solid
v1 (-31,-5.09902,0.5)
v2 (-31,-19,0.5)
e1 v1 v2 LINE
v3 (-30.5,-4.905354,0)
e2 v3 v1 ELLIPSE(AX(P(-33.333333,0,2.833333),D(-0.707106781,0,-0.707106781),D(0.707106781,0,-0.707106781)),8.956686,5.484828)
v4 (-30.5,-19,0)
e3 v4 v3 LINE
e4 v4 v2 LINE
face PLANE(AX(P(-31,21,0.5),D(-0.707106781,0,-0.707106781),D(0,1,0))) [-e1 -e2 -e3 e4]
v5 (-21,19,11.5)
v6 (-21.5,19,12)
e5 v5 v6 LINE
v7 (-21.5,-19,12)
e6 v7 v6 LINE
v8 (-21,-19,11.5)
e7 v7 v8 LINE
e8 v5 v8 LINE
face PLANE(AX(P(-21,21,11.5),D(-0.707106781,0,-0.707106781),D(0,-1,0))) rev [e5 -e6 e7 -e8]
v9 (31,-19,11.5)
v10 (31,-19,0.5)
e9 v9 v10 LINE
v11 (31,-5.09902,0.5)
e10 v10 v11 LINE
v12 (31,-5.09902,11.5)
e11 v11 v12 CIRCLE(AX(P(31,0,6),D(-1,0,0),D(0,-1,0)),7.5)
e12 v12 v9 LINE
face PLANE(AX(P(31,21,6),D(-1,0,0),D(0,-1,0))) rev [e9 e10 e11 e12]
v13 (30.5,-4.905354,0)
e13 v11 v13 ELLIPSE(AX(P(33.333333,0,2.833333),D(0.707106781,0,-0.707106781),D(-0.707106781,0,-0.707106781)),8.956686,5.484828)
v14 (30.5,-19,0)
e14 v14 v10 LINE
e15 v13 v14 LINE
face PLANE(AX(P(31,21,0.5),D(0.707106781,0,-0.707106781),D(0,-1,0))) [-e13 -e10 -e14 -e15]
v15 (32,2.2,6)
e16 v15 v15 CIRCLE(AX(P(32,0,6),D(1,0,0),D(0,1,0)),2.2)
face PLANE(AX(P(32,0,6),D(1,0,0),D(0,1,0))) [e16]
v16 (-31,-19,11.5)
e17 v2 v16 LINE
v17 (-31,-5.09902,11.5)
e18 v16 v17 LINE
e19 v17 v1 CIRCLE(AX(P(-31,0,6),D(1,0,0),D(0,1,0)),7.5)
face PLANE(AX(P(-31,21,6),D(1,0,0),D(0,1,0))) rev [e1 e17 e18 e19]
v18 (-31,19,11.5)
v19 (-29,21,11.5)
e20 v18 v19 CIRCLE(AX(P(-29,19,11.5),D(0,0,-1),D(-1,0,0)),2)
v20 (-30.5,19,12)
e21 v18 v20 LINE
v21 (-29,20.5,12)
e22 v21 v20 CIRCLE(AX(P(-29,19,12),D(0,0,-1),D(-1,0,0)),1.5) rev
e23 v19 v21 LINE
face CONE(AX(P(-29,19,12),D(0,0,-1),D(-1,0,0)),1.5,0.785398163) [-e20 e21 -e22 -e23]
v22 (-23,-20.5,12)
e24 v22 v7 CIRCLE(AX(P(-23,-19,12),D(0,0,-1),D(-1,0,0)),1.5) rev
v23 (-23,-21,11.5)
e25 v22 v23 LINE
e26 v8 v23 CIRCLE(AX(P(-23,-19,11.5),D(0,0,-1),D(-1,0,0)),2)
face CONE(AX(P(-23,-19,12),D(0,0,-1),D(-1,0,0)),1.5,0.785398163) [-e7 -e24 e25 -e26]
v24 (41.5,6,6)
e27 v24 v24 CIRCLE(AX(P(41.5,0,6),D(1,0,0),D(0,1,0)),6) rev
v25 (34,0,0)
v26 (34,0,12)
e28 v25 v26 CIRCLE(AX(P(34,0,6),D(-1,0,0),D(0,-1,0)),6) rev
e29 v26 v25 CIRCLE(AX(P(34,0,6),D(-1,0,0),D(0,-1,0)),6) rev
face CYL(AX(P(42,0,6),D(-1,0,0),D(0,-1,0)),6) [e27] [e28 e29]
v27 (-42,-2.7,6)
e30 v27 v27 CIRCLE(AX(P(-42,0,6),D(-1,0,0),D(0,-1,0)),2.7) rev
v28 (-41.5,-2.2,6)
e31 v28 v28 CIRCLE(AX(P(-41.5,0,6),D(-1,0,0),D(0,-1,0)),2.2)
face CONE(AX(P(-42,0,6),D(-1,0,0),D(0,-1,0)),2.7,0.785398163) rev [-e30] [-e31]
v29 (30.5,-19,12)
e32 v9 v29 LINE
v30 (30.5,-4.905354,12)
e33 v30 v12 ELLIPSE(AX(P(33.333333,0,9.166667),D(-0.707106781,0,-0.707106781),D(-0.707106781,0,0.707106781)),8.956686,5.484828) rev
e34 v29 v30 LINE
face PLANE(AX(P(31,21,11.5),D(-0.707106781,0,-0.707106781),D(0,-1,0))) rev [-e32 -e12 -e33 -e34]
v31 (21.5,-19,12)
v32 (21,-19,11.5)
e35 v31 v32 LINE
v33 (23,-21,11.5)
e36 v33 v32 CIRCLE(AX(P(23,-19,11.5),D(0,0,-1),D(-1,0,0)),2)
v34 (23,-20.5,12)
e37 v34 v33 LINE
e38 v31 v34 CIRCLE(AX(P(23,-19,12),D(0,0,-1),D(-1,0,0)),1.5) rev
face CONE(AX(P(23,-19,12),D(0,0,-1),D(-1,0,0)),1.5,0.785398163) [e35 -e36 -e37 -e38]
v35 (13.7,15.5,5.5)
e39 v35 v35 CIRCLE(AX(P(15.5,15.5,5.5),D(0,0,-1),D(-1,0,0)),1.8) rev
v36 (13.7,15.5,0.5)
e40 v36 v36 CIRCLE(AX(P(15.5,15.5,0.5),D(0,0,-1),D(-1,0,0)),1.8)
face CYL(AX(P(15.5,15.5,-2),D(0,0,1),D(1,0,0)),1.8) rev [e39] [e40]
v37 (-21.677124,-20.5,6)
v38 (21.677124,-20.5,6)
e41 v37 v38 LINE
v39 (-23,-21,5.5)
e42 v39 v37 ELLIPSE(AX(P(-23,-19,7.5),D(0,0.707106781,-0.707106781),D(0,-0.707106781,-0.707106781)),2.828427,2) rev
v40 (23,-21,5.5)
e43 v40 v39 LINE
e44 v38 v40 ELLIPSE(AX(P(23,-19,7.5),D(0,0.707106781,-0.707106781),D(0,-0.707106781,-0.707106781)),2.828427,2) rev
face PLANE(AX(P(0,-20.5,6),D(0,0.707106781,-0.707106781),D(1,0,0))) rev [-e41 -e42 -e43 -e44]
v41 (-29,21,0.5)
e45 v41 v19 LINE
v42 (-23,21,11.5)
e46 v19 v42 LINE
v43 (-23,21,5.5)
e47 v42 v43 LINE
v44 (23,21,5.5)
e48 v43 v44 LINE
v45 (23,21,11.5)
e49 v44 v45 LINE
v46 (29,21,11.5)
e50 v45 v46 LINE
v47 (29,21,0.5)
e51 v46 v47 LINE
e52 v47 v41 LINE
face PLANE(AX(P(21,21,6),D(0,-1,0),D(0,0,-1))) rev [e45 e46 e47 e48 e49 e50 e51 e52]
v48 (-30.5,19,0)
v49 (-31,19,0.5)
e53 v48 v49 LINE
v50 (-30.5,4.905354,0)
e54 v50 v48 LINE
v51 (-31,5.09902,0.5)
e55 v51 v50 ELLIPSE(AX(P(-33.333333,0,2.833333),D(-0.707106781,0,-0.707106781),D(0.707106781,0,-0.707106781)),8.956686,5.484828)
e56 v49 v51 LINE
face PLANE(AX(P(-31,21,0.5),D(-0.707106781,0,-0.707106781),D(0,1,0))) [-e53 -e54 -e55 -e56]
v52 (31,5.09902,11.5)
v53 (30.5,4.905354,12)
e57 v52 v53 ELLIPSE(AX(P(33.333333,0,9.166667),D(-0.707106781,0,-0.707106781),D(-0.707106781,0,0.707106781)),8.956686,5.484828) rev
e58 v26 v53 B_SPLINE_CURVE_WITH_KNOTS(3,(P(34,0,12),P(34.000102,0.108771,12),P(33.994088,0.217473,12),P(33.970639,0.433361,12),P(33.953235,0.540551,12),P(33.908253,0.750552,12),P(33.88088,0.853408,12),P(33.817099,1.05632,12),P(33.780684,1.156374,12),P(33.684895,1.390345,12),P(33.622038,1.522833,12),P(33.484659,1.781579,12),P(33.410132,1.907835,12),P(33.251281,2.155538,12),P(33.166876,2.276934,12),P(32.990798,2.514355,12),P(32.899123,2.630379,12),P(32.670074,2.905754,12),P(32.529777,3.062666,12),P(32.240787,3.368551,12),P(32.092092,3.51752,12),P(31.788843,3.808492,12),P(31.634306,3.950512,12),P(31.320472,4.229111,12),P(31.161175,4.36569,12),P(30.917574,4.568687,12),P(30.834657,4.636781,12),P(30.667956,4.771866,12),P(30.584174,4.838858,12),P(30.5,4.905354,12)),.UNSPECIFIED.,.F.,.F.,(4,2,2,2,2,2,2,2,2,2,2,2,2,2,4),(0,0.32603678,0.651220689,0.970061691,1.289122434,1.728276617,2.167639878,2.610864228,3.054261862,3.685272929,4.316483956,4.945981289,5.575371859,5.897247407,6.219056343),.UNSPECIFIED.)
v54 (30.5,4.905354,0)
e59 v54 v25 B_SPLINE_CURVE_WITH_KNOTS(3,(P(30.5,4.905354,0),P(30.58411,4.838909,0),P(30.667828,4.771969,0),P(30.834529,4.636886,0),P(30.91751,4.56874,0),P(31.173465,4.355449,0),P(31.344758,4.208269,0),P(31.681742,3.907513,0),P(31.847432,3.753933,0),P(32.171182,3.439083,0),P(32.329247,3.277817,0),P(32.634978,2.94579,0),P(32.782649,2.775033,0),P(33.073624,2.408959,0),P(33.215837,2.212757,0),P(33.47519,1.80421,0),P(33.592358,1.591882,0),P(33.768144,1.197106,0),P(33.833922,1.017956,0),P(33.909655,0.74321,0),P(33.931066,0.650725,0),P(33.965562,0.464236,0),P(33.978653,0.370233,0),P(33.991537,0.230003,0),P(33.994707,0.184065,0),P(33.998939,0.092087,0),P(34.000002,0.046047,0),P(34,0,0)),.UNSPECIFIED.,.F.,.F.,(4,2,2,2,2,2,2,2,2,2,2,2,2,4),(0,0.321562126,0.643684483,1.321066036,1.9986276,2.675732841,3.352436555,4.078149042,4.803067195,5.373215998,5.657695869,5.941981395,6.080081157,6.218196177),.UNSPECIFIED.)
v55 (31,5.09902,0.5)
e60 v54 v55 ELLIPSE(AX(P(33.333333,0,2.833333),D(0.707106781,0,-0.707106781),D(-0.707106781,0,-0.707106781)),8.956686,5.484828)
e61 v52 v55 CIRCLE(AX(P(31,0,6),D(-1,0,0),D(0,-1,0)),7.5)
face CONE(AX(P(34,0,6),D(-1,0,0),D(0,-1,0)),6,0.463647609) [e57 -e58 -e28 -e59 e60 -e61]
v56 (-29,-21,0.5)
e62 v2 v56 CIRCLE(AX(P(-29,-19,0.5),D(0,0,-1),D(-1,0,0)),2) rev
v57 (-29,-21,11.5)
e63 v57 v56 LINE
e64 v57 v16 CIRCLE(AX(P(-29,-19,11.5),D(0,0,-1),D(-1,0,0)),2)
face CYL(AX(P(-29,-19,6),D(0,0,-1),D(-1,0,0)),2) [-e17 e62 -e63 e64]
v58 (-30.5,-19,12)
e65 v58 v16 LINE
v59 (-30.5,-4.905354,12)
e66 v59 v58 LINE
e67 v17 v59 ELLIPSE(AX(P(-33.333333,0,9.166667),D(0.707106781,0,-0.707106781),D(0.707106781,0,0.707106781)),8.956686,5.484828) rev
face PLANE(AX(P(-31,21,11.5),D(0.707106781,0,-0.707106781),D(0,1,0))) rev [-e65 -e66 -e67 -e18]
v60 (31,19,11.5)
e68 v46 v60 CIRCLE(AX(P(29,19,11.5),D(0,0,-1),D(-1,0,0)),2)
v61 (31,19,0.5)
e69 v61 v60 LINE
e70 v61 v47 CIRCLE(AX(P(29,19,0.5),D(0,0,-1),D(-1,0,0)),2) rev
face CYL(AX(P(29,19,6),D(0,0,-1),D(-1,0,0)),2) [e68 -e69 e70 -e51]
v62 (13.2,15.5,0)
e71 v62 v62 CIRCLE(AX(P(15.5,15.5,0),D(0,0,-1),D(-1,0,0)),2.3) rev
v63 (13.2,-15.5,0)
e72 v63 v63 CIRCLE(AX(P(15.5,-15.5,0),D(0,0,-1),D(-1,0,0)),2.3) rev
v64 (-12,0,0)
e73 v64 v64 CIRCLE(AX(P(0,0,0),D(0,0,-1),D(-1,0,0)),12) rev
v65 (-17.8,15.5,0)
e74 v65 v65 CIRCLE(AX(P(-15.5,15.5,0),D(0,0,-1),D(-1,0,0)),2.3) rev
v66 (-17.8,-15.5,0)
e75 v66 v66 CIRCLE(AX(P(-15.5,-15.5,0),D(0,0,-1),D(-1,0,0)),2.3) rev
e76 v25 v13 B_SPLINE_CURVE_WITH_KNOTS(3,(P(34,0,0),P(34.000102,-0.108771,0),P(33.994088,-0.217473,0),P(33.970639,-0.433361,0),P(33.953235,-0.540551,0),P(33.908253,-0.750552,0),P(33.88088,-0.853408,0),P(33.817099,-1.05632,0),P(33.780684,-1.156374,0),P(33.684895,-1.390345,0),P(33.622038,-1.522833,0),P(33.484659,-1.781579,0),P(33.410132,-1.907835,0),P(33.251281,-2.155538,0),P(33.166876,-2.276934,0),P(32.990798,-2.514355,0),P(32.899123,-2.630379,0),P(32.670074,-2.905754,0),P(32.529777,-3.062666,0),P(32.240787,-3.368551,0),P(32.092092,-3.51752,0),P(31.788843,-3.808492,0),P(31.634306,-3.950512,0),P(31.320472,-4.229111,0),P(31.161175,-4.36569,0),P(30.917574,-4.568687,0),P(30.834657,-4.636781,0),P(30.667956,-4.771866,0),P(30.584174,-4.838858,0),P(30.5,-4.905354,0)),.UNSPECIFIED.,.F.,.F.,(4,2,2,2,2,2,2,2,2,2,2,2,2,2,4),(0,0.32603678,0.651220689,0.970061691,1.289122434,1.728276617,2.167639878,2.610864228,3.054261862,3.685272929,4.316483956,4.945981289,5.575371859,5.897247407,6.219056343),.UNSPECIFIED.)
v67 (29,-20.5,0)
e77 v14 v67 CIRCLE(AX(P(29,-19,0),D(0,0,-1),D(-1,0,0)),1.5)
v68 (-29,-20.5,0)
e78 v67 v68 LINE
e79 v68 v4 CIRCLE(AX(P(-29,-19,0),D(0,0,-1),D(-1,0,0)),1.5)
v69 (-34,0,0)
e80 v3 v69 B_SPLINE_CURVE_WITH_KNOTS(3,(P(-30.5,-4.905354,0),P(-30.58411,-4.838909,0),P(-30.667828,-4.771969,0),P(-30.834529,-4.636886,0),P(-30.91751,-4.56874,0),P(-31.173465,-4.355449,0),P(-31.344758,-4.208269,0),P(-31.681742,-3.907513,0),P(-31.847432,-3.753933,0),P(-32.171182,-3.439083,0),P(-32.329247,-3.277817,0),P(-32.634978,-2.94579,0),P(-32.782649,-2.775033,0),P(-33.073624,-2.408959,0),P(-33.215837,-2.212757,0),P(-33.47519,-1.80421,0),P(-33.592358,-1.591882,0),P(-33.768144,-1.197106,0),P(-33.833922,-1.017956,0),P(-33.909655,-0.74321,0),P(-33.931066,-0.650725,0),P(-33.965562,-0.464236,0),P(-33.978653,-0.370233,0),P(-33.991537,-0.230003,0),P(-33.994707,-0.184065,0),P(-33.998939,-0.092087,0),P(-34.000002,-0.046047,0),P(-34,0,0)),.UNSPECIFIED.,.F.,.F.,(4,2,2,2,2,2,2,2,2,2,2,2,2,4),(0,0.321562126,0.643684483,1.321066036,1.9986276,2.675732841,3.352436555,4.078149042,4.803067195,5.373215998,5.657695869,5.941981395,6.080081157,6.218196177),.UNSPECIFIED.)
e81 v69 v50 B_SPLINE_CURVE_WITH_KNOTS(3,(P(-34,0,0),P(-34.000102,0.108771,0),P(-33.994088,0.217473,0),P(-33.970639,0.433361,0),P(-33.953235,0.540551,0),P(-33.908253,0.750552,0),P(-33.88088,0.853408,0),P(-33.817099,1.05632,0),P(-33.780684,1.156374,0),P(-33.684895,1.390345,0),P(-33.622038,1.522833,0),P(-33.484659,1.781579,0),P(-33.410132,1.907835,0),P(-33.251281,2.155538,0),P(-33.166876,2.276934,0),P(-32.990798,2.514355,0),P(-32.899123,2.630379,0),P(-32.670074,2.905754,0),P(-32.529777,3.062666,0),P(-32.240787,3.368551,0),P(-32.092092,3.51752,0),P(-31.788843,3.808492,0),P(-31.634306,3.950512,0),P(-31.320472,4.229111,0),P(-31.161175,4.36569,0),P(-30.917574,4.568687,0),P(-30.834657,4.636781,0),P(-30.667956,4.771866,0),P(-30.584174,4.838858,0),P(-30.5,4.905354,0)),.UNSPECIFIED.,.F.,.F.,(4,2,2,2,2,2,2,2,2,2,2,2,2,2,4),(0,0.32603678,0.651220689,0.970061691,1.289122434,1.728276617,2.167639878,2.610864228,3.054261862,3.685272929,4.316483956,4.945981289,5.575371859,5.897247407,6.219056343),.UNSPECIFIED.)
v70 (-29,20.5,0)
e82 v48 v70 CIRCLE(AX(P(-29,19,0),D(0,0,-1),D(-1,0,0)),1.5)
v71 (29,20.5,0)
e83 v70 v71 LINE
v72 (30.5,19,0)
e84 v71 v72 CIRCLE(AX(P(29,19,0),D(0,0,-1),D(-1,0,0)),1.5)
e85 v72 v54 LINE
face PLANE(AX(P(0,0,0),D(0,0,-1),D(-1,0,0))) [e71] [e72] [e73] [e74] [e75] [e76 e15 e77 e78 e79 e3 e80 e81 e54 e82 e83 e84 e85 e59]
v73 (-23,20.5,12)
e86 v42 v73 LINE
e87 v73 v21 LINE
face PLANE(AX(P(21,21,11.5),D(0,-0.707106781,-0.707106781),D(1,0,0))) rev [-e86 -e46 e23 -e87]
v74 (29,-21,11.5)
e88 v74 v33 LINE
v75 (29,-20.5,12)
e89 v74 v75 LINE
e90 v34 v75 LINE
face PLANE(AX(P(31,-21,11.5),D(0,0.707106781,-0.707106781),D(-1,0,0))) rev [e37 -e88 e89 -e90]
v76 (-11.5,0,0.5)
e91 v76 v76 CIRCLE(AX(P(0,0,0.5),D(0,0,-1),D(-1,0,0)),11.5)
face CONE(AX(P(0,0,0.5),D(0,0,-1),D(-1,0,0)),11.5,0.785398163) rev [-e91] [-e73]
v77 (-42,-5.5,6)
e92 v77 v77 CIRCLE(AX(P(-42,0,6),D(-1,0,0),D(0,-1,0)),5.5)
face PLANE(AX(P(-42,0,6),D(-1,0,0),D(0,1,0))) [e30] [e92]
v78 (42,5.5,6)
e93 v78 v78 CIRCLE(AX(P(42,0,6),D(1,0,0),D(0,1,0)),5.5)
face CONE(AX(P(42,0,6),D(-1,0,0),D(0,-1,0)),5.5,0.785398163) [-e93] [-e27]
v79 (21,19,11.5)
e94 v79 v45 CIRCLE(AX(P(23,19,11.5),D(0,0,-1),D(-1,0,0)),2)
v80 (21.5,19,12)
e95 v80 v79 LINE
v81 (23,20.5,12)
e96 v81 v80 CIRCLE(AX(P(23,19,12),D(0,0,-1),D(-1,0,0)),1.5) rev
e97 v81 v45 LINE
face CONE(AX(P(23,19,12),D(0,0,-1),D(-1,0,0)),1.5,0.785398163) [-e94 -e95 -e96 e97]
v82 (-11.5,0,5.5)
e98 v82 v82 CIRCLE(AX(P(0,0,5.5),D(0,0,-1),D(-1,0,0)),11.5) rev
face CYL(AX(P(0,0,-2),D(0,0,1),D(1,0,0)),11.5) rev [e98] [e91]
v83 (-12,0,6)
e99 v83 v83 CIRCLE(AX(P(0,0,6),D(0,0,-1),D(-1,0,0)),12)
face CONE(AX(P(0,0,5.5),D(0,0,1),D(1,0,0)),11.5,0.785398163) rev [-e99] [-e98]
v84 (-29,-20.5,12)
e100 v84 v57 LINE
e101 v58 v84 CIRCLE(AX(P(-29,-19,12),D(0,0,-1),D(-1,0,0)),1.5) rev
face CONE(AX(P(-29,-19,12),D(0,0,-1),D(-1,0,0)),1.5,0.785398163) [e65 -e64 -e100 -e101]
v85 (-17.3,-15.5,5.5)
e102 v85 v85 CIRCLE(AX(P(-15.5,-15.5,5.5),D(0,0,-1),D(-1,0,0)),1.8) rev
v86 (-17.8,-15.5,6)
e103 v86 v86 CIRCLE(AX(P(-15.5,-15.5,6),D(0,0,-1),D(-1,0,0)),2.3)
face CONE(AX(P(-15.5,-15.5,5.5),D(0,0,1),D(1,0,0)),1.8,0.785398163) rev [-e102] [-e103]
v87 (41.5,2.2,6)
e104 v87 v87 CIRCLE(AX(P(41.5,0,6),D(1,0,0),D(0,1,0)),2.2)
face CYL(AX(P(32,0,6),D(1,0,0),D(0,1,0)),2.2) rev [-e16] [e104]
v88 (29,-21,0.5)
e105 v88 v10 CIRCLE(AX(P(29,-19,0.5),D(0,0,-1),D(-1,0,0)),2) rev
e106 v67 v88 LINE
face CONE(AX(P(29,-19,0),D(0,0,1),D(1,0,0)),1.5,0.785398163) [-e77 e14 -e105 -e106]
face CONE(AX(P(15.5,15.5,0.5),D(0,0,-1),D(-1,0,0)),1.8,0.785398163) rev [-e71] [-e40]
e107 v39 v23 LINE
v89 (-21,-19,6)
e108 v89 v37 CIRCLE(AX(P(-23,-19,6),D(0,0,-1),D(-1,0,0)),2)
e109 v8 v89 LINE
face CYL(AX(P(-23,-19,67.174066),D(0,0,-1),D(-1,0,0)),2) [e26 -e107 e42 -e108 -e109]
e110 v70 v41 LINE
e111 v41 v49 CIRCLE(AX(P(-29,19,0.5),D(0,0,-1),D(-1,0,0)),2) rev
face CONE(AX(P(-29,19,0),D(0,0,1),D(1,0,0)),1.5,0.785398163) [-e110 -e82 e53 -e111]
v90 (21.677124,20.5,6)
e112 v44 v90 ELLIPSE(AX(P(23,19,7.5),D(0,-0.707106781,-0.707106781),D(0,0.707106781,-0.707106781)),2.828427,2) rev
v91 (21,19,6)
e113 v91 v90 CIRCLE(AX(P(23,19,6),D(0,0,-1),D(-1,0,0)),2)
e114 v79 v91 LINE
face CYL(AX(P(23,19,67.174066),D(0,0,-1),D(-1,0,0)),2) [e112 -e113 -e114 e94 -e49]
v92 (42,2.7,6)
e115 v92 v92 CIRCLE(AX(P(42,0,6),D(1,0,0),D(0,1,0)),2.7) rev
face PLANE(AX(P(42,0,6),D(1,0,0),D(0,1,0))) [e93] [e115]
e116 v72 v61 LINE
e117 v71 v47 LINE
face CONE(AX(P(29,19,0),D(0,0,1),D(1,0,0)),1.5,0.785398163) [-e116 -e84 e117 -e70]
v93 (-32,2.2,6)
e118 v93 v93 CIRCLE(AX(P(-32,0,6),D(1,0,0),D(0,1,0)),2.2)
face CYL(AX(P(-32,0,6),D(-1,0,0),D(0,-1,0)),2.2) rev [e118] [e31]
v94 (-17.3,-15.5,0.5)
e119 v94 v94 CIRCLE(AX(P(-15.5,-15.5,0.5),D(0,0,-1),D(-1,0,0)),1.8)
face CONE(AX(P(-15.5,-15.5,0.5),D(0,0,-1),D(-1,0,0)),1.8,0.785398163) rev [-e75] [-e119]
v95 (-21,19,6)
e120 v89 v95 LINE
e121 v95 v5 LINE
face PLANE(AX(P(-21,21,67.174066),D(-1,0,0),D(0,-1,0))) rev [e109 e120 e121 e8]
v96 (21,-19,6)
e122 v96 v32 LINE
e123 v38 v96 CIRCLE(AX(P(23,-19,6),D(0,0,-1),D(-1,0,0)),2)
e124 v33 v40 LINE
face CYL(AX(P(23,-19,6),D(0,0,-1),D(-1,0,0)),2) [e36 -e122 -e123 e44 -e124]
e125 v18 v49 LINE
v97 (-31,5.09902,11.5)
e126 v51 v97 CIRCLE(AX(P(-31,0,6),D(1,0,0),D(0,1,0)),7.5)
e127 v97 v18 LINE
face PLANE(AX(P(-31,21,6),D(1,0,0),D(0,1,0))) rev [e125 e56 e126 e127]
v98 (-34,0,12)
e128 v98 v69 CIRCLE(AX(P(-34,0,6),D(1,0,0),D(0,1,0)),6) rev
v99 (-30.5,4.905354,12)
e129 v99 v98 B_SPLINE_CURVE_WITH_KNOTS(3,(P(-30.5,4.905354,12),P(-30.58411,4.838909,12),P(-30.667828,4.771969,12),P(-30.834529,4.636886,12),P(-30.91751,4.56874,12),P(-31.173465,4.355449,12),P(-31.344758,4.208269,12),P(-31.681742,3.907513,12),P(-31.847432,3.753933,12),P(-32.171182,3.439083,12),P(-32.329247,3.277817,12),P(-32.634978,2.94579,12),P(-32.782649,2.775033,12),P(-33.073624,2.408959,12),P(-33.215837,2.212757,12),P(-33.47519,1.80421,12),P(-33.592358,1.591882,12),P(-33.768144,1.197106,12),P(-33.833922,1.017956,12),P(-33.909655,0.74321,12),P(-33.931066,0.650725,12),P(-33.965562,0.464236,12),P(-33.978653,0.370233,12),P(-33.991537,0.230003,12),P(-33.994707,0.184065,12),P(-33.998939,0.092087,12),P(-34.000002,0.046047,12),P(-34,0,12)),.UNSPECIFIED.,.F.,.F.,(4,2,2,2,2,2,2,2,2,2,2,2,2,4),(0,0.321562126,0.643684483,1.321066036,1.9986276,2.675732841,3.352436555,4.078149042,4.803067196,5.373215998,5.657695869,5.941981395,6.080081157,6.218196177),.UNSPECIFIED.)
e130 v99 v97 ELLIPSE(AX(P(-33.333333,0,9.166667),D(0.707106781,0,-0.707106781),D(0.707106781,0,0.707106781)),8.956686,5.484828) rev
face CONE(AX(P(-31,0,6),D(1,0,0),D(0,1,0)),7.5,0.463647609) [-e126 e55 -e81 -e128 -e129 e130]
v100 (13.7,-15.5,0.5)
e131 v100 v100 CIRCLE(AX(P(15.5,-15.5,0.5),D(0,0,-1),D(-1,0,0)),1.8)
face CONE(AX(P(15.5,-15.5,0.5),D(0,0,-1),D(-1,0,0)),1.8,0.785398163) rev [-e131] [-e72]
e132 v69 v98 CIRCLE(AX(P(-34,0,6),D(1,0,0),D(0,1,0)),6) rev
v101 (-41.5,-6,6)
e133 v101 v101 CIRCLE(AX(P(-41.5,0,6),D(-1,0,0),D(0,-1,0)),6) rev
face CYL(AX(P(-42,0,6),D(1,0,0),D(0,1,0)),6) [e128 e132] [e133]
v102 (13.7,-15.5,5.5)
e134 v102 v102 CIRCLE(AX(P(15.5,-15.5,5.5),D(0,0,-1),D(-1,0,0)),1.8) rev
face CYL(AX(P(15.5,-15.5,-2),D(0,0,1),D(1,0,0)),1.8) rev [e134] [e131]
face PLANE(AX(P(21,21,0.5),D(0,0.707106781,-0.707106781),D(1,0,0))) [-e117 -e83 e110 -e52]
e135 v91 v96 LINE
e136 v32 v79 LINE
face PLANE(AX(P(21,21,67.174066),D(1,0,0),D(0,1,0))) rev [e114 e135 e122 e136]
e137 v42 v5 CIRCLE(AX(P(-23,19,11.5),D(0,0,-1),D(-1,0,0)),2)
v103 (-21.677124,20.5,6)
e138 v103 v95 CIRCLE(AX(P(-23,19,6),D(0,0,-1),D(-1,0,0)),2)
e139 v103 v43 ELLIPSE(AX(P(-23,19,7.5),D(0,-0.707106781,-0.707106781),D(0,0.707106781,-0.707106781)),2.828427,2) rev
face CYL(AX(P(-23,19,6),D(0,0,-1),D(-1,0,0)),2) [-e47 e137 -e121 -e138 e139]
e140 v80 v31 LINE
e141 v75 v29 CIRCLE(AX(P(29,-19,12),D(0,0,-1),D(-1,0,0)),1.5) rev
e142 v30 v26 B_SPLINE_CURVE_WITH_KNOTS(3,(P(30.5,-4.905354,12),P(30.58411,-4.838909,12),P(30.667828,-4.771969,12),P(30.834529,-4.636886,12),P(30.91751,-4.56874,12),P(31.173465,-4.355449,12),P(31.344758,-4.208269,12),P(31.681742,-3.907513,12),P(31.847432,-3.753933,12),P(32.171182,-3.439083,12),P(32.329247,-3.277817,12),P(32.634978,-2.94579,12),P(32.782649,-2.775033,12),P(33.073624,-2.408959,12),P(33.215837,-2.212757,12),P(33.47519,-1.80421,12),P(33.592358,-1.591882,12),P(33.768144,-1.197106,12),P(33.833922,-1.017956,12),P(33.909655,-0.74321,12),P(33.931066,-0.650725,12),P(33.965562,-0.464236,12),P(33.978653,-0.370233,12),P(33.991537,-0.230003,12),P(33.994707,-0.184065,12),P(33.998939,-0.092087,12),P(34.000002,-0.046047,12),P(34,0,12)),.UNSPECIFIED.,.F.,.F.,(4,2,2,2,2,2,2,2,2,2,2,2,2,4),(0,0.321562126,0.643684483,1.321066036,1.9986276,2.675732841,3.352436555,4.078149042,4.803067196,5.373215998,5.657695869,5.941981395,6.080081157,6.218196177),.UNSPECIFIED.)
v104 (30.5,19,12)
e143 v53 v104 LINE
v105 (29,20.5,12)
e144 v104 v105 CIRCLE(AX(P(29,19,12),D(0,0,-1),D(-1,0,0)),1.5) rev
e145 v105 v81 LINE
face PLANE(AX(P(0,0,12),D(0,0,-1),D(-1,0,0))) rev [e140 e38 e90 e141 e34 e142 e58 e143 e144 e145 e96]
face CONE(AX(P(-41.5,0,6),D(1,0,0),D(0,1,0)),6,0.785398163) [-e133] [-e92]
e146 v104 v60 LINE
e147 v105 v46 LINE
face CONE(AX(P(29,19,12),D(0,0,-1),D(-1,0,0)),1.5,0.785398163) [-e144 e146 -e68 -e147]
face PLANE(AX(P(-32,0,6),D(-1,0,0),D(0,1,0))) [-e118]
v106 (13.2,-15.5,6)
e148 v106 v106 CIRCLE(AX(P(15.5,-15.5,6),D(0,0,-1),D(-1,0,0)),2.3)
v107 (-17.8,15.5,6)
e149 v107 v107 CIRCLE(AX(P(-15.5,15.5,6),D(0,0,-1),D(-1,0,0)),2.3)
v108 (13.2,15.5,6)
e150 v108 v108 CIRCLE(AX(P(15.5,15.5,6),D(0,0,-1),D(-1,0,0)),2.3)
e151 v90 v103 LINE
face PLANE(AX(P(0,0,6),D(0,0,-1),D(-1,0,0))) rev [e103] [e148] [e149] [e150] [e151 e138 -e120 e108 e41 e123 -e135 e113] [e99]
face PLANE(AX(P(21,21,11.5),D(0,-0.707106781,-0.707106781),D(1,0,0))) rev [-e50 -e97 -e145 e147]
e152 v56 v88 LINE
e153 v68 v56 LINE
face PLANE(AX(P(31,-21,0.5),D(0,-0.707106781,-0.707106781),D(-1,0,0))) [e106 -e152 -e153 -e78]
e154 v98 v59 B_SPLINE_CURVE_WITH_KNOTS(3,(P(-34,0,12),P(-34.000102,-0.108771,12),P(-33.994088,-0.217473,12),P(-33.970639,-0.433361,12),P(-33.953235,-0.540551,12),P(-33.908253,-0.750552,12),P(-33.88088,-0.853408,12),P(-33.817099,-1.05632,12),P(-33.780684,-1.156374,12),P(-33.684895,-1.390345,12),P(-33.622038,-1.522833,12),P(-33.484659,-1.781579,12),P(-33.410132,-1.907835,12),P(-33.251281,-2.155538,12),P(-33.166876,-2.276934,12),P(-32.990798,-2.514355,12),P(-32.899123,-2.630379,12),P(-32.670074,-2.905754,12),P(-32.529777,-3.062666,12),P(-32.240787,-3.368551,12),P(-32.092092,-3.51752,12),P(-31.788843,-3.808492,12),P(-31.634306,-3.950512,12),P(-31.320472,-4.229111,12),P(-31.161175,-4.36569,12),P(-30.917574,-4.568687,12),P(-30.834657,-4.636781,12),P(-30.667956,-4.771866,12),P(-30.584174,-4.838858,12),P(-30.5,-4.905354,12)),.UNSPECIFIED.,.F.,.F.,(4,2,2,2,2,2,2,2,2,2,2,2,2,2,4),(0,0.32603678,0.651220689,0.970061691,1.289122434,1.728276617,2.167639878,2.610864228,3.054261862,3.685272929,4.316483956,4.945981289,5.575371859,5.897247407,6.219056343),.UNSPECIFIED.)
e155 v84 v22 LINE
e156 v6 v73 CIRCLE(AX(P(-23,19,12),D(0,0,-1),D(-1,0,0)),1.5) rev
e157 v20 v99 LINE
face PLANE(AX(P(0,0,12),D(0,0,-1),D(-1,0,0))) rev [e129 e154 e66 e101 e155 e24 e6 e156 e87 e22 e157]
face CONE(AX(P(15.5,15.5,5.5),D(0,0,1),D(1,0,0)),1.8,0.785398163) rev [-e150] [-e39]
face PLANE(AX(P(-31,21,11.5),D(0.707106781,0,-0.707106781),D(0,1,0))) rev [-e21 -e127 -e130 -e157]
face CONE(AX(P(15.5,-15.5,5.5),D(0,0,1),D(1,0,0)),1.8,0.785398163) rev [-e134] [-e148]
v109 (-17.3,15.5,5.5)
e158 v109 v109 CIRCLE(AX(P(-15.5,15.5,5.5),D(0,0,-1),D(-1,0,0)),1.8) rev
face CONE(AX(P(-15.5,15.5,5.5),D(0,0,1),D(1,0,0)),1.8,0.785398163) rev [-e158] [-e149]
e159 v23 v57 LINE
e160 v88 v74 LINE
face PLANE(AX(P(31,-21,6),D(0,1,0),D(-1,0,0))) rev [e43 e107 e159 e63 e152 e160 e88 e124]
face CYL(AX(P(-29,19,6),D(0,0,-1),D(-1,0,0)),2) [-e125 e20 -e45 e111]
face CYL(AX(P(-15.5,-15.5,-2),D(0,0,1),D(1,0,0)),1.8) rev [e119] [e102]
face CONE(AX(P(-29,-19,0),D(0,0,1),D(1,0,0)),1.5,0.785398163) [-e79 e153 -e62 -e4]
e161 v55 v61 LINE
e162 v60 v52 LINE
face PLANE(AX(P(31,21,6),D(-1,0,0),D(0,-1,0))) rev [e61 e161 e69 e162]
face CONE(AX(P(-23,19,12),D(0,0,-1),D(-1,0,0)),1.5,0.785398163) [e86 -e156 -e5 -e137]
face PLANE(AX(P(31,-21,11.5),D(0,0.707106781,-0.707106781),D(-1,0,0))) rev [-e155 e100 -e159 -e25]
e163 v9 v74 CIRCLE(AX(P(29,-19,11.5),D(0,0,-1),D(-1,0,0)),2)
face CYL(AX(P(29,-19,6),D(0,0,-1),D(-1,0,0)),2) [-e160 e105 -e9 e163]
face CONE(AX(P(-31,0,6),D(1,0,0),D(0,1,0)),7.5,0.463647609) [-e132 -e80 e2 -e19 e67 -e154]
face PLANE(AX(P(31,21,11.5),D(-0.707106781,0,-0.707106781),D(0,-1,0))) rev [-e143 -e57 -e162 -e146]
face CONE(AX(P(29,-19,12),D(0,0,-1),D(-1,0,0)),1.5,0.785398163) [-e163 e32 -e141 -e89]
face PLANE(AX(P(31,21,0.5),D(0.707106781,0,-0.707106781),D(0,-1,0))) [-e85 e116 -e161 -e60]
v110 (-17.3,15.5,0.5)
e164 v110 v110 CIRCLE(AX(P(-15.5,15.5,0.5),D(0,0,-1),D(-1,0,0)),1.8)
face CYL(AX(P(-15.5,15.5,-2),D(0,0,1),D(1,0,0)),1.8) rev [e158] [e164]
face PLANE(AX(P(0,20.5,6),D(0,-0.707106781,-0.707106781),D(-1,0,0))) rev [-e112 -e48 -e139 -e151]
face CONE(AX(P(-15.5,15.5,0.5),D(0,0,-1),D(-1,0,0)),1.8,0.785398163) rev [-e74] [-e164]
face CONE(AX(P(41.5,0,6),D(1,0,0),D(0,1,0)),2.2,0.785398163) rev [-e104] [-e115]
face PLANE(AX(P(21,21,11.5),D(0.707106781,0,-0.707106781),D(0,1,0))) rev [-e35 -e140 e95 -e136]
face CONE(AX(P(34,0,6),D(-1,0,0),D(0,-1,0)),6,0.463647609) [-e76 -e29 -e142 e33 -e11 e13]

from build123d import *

# Parameters (mm, degrees)
AUFSATZ_LINEAR_AUSTRAGEN1_DEPTH = 6
SKIZZE2_W                       = 10
SKIZZE2_H                       = 42
AUFSATZ_LINEAR_AUSTRAGEN2_DEPTH = 6
SKIZZE3_R                       = 6
AUFSATZ_LINEAR_AUSTRAGEN3_DEPTH = 11
SKIZZE5_R                       = 2.2
SCHNITT_LINEAR_AUSTRAGEN2_DEPTH = 10
SKIZZE4_R                       = 11.5
SKIZZE4_R_2                     = 1.8
SCHNITT_LINEAR_AUSTRAGEN1_DEPTH = 8
FASE1_SIZE                      = 1.5
FASE1_SIZE_2                    = 3
FASE2_SIZE                      = 1.5
FASE2_SIZE_2                    = 3
VERRUNDUNG1_R                   = 2
FASE3_SIZE                      = 0.5


with BuildPart() as part:
    # Skizze1 → Aufsatz-Linear austragen1 (new body)
    with BuildSketch(Plane.XY):
        Polygon((21, 21), (31, 21), (31, -21), (21, -21), (-21, -21), (-31, -21), (-31, 21), (-21, 21), align=None)
    extrude(amount=AUFSATZ_LINEAR_AUSTRAGEN1_DEPTH)

    # Skizze2 → Aufsatz-Linear austragen2 (add)
    with BuildSketch(Plane.XY.offset(6)):
        with Locations((26, 0)):
            Rectangle(SKIZZE2_W, SKIZZE2_H)
        with Locations((-26, 0)):
            Rectangle(SKIZZE2_W, SKIZZE2_H)
    extrude(amount=AUFSATZ_LINEAR_AUSTRAGEN2_DEPTH)

    # Skizze3 → Aufsatz-Linear austragen3 (add)
    with BuildSketch(Plane(origin=(31, 0, 0), x_dir=(0, 0, -1), z_dir=(1, 0, 0))):
        with Locations((-6, 0)):
            Circle(SKIZZE3_R)
    aufsatz_linear_austragen3 = extrude(amount=AUFSATZ_LINEAR_AUSTRAGEN3_DEPTH)

    # Skizze5 → Schnitt-Linear austragen2 (cut)
    with BuildSketch(Plane(origin=(42, 0, 0), x_dir=(0, 0, -1), z_dir=(1, 0, 0))):
        with Locations(Location((-6, 0, 0), (0, 0, 90))):
            Circle(SKIZZE5_R)
    schnitt_linear_austragen2 = extrude(amount=-SCHNITT_LINEAR_AUSTRAGEN2_DEPTH, mode=Mode.SUBTRACT)

    # Spiegeln1: Aufsatz-Linear austragen3, Schnitt-Linear austragen2 across plane
    add(aufsatz_linear_austragen3.mirror(Plane(origin=(0, 0, 0), x_dir=(0, 0, 1), z_dir=(1, 0, 0))))
    add(schnitt_linear_austragen2.mirror(Plane(origin=(0, 0, 0), x_dir=(0, 0, 1), z_dir=(1, 0, 0))), mode=Mode.SUBTRACT)

    # Skizze4 → Schnitt-Linear austragen1 (cut)
    with BuildSketch(Plane.XY.offset(6)):
        Circle(SKIZZE4_R)
        with Locations((-15.5, 15.5)):
            Circle(SKIZZE4_R_2)
        with Locations((15.5, 15.5)):
            Circle(SKIZZE4_R_2)
        with Locations((15.5, -15.5)):
            Circle(SKIZZE4_R_2)
        with Locations((-15.5, -15.5)):
            Circle(SKIZZE4_R_2)
    extrude(amount=-SCHNITT_LINEAR_AUSTRAGEN1_DEPTH, mode=Mode.SUBTRACT)

    # Fase1
    # the kernel refuses this chamfer: 3, 1.5 mm, written as the material it adds along each edge
    with BuildSketch(Plane(origin=(31, 0, 6), x_dir=(0, 0, -1), z_dir=(0, -1, 0))) as fase1_piece_1_section:
        Polygon((6 + FASE1_SIZE, 0), (6, FASE1_SIZE_2), (6, 0), align=None)
    fase1_piece_1 = revolve(axis=Axis((31, 0, 6), (1, 0, 0)), revolution_arc=179.999999686, mode=Mode.PRIVATE)
    fase1_piece_1 = split(fase1_piece_1, bisect_by=Plane(origin=(32.485350769, 6.720701537, 0), z_dir=(0, 0, 1)), keep=Keep.TOP, mode=Mode.PRIVATE)
    fase1_piece_1 = split(fase1_piece_1, bisect_by=Plane(origin=(32.485350769, 6.720701537, 12), z_dir=(0, 0, -1)), keep=Keep.TOP, mode=Mode.PRIVATE)
    add(fase1_piece_1)
    with BuildSketch(Plane(origin=(31, 0, 6), x_dir=(0, 5.472961761905791e-09, 1.0), z_dir=(0, 1.0, -5.472961761905791e-09))) as fase1_piece_2_section:
        Polygon((6 + FASE1_SIZE, 0), (6, FASE1_SIZE_2), (6, 0), align=None)
    fase1_piece_2 = revolve(axis=Axis((31, 0, 6), (1, 0, 0)), revolution_arc=180.000000314, mode=Mode.PRIVATE)
    fase1_piece_2 = split(fase1_piece_2, bisect_by=Plane(origin=(32.485350772, -6.720701535, 0), z_dir=(0, 0, 1)), keep=Keep.TOP, mode=Mode.PRIVATE)
    fase1_piece_2 = split(fase1_piece_2, bisect_by=Plane(origin=(32.485350772, -6.720701535, 12), z_dir=(0, 0, -1)), keep=Keep.TOP, mode=Mode.PRIVATE)
    add(fase1_piece_2)

    # Fase2
    # the kernel refuses this chamfer: 3, 1.5 mm, written as the material it adds along each edge
    with BuildSketch(Plane(origin=(-31, 0, 6), x_dir=(0, 0, -1), z_dir=(0, -1, 0))) as fase2_piece_1_section:
        Polygon((6 + FASE2_SIZE, 0), (6, -FASE2_SIZE_2), (6, 0), align=None)
    fase2_piece_1 = revolve(axis=Axis((-31, 0, 6), (1, 0, 0)), revolution_arc=179.999999686, mode=Mode.PRIVATE)
    fase2_piece_1 = split(fase2_piece_1, bisect_by=Plane(origin=(-32.485350769, 6.720701537, 0), z_dir=(0, 0, 1)), keep=Keep.TOP, mode=Mode.PRIVATE)
    fase2_piece_1 = split(fase2_piece_1, bisect_by=Plane(origin=(-32.485350769, 6.720701537, 12), z_dir=(0, 0, -1)), keep=Keep.TOP, mode=Mode.PRIVATE)
    add(fase2_piece_1)
    with BuildSketch(Plane(origin=(-31, 0, 6), x_dir=(0, 5.472961761905791e-09, 1.0), z_dir=(0, 1.0, -5.472961761905791e-09))) as fase2_piece_2_section:
        Polygon((6 + FASE2_SIZE, 0), (6, -FASE2_SIZE_2), (6, 0), align=None)
    fase2_piece_2 = revolve(axis=Axis((-31, 0, 6), (1, 0, 0)), revolution_arc=180.000000314, mode=Mode.PRIVATE)
    fase2_piece_2 = split(fase2_piece_2, bisect_by=Plane(origin=(-32.485350772, -6.720701535, 0), z_dir=(0, 0, 1)), keep=Keep.TOP, mode=Mode.PRIVATE)
    fase2_piece_2 = split(fase2_piece_2, bisect_by=Plane(origin=(-32.485350772, -6.720701535, 12), z_dir=(0, 0, -1)), keep=Keep.TOP, mode=Mode.PRIVATE)
    add(fase2_piece_2)

    # Verrundung1
    verrundung1_edges = [part.edges().sort_by_distance(p)[0] for p in [
        (31, 21, 6),
        (31, -21, 6),
        (-31, -21, 6),
        (-31, 21, 6),
        (21, -21, 9),
        (21, 21, 9),
        (-21, 21, 9),
        (-21, -21, 9),
    ]]
    fillet(verrundung1_edges, radius=VERRUNDUNG1_R)

    # Fase3
    fase3_edges = [part.edges().sort_by_distance(p)[0] for p in [
        (-31, -11.75, 0),
        (-31, 11.75, 12),
        (-21, 0, 12),
        (0, -21, 0),
        (26, -21, 12),
        (-26, -21, 12),
        (-26, 21, 12),
        (-31, -11.75, 12),
        (-30.414213562, 20.414213562, 12),
        (-30.414213562, -20.414213562, 12),
        (-21.585786438, 20.414213562, 12),
        (-21.585786438, -20.414213562, 12),
        (21, 0, 12),
        (31, 11.75, 12),
        (26, 21, 12),
        (30.414213562, 20.414213562, 12),
        (30.414213562, -20.414213562, 12),
        (21.585786438, 20.414213562, 12),
        (21.585786438, -20.414213562, 12),
        (0, 21, 0),
        (-31, 11.75, 0),
        (31, -11.75, 0),
        (30.414213562, 20.414213562, 0),
        (-30.414213562, 20.414213562, 0),
        (30.414213562, -20.414213562, 0),
        (-30.414213562, -20.414213562, 0),
        (0, 21, 6),
        (0, -21, 6),
        (42, 0, 12),
        (42, -2.2, 6),
        (-42, 0, 12),
        (-42, -2.2, 6),
        (-17.3, -15.5, 0),
        (-17.3, -15.5, 6),
        (13.7, -15.5, 0),
        (13.7, -15.5, 6),
        (13.7, 15.5, 0),
        (13.7, 15.5, 6),
        (-17.3, 15.5, 0),
        (-17.3, 15.5, 6),
        (-11.5, 0, 0),
        (-11.5, 0, 6),
        (31, -11.75, 12),
        (31, 11.75, 0),
    ]]
    chamfer(fase3_edges, length=FASE3_SIZE)


solid = part.part
